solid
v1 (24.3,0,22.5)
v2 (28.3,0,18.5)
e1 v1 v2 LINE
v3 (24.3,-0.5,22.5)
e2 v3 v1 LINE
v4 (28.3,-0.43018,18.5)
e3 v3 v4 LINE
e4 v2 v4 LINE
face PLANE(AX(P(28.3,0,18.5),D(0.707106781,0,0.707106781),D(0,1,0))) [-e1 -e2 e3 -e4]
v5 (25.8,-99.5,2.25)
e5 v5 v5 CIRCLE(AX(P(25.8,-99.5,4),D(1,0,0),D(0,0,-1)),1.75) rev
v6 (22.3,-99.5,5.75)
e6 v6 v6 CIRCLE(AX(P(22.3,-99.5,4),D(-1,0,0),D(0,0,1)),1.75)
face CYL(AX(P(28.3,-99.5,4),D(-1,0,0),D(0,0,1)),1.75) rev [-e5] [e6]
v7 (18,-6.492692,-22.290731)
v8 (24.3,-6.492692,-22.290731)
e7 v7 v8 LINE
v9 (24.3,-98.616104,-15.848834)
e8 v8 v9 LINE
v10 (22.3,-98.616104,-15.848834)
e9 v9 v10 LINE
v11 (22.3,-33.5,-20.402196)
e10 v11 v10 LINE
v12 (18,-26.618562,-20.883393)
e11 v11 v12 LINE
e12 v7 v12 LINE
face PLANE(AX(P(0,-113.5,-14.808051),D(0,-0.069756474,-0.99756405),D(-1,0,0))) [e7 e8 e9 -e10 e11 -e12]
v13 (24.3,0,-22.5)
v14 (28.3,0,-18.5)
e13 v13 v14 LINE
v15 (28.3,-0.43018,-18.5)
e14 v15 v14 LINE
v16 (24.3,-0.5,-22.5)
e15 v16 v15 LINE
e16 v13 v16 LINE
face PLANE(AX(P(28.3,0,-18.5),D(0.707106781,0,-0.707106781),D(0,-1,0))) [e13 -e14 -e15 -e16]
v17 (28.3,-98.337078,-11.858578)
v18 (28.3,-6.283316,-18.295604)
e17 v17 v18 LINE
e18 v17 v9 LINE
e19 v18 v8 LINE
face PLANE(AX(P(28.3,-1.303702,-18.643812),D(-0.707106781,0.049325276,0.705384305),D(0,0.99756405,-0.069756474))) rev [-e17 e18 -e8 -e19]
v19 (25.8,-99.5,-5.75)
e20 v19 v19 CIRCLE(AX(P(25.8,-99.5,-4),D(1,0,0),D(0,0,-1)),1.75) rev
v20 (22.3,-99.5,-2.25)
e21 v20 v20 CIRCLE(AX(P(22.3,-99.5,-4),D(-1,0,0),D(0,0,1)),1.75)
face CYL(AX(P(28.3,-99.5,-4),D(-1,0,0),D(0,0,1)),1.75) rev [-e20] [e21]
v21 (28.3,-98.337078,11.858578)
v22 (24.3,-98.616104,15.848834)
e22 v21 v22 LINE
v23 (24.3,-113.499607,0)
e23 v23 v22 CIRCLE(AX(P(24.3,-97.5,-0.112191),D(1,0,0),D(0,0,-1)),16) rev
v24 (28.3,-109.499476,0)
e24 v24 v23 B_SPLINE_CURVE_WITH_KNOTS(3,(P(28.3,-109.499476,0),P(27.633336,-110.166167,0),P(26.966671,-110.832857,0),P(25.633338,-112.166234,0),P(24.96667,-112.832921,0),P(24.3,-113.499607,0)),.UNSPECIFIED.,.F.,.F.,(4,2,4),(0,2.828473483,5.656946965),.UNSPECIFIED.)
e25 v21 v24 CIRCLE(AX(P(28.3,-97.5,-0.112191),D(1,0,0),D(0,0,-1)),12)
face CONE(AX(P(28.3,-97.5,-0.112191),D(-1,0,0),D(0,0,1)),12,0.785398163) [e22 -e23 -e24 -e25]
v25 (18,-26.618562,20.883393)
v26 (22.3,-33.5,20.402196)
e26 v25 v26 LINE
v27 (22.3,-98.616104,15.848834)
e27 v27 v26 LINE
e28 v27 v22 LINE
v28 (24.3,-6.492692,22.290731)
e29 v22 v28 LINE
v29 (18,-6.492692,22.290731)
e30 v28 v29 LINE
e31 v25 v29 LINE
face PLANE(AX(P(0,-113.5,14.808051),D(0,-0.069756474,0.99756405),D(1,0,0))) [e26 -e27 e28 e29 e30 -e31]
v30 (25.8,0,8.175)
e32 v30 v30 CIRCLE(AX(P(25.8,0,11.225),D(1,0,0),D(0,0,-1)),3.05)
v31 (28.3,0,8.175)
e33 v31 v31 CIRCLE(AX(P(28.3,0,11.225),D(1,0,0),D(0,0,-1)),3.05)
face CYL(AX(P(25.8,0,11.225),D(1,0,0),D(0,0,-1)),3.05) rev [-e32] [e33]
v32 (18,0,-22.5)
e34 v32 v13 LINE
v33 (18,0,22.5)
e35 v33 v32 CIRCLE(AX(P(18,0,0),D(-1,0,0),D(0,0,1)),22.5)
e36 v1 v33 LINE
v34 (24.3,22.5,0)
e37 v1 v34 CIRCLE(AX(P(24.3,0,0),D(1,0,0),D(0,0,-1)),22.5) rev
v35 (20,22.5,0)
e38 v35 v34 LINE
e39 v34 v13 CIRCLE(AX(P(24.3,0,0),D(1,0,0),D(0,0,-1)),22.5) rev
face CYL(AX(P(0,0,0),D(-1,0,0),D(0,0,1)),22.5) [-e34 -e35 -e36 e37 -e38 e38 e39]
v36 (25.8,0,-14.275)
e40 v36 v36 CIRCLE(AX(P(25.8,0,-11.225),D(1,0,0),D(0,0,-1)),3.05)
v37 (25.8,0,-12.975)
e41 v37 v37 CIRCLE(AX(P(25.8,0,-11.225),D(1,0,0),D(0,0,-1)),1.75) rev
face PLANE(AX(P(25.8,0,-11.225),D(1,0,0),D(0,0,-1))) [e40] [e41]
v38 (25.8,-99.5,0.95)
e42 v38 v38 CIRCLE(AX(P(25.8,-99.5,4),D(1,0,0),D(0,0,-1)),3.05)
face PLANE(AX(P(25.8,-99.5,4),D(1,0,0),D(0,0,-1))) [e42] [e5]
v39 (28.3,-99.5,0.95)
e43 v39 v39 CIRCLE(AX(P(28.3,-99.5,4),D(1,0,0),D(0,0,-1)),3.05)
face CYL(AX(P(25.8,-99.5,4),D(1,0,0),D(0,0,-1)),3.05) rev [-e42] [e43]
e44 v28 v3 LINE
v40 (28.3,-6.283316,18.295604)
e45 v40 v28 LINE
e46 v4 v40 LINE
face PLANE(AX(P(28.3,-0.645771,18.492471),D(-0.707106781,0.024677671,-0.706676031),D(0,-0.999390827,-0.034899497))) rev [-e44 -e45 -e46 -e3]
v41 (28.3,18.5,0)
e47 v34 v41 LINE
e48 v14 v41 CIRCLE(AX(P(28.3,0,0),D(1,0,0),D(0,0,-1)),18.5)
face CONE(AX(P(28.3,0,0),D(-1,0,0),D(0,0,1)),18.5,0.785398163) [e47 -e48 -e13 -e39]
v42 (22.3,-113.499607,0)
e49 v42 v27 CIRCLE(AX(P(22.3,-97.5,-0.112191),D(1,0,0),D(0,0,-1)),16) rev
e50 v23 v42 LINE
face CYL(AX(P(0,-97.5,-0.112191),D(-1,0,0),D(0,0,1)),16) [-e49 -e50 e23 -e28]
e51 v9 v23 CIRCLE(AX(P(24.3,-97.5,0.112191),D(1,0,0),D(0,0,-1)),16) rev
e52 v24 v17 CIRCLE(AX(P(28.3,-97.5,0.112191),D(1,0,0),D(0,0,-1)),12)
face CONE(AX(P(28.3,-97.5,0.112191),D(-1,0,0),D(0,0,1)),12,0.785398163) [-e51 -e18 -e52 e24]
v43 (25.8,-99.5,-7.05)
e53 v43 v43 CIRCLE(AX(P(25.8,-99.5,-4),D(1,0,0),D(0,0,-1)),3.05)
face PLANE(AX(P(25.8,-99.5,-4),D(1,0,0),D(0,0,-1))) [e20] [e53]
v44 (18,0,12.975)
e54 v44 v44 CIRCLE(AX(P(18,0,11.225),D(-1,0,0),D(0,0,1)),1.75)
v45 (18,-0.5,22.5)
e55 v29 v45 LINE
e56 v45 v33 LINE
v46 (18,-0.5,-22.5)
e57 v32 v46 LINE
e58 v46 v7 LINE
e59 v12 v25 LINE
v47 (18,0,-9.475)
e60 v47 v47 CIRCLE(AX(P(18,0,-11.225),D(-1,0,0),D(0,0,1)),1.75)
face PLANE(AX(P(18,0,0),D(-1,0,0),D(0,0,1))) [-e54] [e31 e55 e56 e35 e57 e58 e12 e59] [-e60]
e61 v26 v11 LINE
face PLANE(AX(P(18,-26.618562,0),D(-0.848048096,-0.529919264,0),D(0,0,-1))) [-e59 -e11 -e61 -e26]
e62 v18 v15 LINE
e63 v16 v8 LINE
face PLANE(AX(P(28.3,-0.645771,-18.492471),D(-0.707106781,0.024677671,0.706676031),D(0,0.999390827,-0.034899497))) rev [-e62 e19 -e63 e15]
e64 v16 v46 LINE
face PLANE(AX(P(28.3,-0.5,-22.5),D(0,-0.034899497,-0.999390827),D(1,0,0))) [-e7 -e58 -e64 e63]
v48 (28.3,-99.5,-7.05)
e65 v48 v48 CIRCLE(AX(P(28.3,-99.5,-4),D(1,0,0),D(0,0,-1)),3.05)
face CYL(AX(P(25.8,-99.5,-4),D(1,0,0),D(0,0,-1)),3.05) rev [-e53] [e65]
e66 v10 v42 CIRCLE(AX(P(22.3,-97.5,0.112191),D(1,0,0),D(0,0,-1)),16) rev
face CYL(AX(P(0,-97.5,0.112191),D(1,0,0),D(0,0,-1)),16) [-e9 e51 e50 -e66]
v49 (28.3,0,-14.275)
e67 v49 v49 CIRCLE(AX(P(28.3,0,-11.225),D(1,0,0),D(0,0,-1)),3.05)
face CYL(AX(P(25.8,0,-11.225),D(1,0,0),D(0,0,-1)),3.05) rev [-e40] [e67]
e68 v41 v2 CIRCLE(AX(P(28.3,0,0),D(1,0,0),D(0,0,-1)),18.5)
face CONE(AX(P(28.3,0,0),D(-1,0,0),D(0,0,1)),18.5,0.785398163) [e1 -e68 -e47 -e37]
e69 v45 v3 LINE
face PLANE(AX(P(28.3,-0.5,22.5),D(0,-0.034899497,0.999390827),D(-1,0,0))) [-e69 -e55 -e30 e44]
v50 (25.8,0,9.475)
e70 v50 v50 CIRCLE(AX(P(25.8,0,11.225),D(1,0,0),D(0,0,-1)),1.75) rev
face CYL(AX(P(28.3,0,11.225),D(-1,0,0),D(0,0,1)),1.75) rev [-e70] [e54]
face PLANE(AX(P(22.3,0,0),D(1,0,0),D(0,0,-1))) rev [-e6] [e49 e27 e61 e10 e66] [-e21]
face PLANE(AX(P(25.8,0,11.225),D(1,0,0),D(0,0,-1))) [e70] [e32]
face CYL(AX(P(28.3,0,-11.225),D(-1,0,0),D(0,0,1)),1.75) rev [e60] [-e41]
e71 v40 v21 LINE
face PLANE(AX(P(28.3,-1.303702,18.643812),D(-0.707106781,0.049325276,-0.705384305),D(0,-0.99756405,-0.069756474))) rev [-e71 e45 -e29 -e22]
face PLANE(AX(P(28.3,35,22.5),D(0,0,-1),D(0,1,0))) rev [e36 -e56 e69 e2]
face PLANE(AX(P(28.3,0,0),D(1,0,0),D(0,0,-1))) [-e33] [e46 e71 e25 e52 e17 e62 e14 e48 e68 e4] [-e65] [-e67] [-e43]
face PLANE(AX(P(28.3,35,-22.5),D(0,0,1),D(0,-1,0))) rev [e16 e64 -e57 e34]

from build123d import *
from OCP.BRepFilletAPI import BRepFilletAPI_MakeChamfer

# Parameters (mm, degrees)
SKETCH1_W           = 20
SKETCH1_H           = 20
BOSS_EXTRUDE1_DEPTH = 20
SKETCH2_W           = 45
SKETCH2_H           = 70
BOSS_EXTRUDE2_DEPTH = 8.3
CUT_EXTRUDE1_DEPTH  = 5.8
FILLET1_R           = 3.6
FILLET2_R           = 10
SKETCH5_R           = 3.9
CUT_EXTRUDE2_DEPTH  = 51.320373608
CUT_EXTRUDE3_REACH  = 49.302
SKETCH6_R           = 1.75
SKETCH13_W          = 20
SKETCH13_H          = 20
CUT_EXTRUDE9_DEPTH  = 20
SKETCH15_W          = 8.3
SKETCH15_H          = 45
CUT_EXTRUDE10_DEPTH = 12.5
SKETCH18_W          = 8.3
SKETCH18_H          = 45
BOSS_EXTRUDE4_DEPTH = 78.5
FILLET5_R           = 22.5
SKETCH20_W          = 45
SKETCH20_H          = 80
CUT_EXTRUDE12_DEPTH = 2.3
CHAMFER2_SIZE       = 110
CHAMFER2_SIZE2      = 7.691949314
CHAMFER3_SIZE       = 3
FILLET6_R           = 16
CHAMFER4_SIZE       = 4
SKETCH21_R          = 1.75
CUT_EXTRUDE15_DEPTH = 116.863759268
SKETCH14_R          = 1.75
CUT_EXTRUDE16_DEPTH = 117.005606381
SKETCH23_W          = 17
SKETCH23_H          = 38.9
BOSS_EXTRUDE5_DEPTH = 8.3
BOSS_EXTRUDE6_START = 2
SKETCH24_R          = 1.75
BOSS_EXTRUDE6_DEPTH = 2
CHAMFER5_SIZE2      = 4.3
CHAMFER5_SIZE       = 6.881438475
SKETCH25_R          = 3.05
CUT_EXTRUDE17_DEPTH = 2.5


# Some blends are built 0.0001 mm under size
with BuildPart() as part:
    # Sketch1 → Boss-Extrude1 (new body)
    with BuildSketch(Plane(origin=(0, 0, 0), x_dir=(0, 0, -1), z_dir=(1, 0, 0))):
        Rectangle(SKETCH1_W, SKETCH1_H)
    extrude(amount=BOSS_EXTRUDE1_DEPTH)

    # Sketch2 → Boss-Extrude2 (add)
    with BuildSketch(Plane(origin=(20, 0, 0), x_dir=(0, 0, -1), z_dir=(1, 0, 0))):
        Rectangle(SKETCH2_W, SKETCH2_H)
    extrude(amount=BOSS_EXTRUDE2_DEPTH)

    # Sketch4 → Cut-Extrude1 (cut)
    with BuildSketch(Plane(origin=(28.3, 0, 0), x_dir=(0, 0, -1), z_dir=(1, 0, 0))):
        with BuildLine():
            Line((3.6, -28.55), (-3.6, -28.55))
            Line((-3.6, -28.55), (-3.6, -7.311805523))
            ThreePointArc((-3.6, -7.311805523), (0, 8.15), (3.6, -7.311805523))
            Line((3.6, -7.311805523), (3.6, -28.55))
        make_face()
    extrude(amount=-CUT_EXTRUDE1_DEPTH, mode=Mode.SUBTRACT)

    # Fillet1
    fillet1_edges = [part.edges().sort_by_distance(p)[0] for p in [
        (25.4, -28.55, 3.6),
        (25.4, -28.55, -3.6),
    ]]
    fillet(fillet1_edges, radius=FILLET1_R - 0.0001)  # a hair under: the kernel refuses the full size

    # Fillet2
    fillet2_edges = [part.edges().sort_by_distance(p)[0] for p in [
        (25.4, -7.311805523, 3.6),
        (25.4, -7.311805523, -3.6),
    ]]
    fillet(fillet2_edges, radius=FILLET2_R)

    # Sketch5 → Cut-Extrude2 (cut, through all)
    with BuildSketch(Plane.ZY):
        Circle(SKETCH5_R)
    extrude(amount=-CUT_EXTRUDE2_DEPTH, mode=Mode.SUBTRACT)

    # Sketch6 → Cut-Extrude3 (cut, up to next)
    with BuildSketch(Plane(origin=(22.5, 0, 0), x_dir=(0, 0, -1), z_dir=(1, 0, 0)), mode=Mode.PRIVATE) as cut_extrude3_sk1:
        with Locations((0, -20.6)):
            Circle(SKETCH6_R)
    cut_extrude3_tool1 = extrude(cut_extrude3_sk1.sketch, amount=-CUT_EXTRUDE3_REACH, mode=Mode.PRIVATE) & part.part
    # Sketch6 → Cut-Extrude3 (cut, up to next)
    with BuildSketch(Plane(origin=(22.5, 0, 0), x_dir=(0, 0, -1), z_dir=(1, 0, 0)), mode=Mode.PRIVATE) as cut_extrude3_sk2:
        with Locations((0, -9.35)):
            Circle(SKETCH6_R)
    cut_extrude3_tool2 = extrude(cut_extrude3_sk2.sketch, amount=-CUT_EXTRUDE3_REACH, mode=Mode.PRIVATE) & part.part
    add(cut_extrude3_tool1.solids().sort_by_distance((22.5, -20.6, 0))[0], mode=Mode.SUBTRACT)
    add(cut_extrude3_tool2.solids().sort_by_distance((22.5, -9.35, 0))[0], mode=Mode.SUBTRACT)

    # Sketch13 → Cut-Extrude9 (cut)
    with BuildSketch(Plane.ZY):
        Rectangle(SKETCH13_W, SKETCH13_H)
    extrude(amount=-CUT_EXTRUDE9_DEPTH, mode=Mode.SUBTRACT)

    # Sketch15 → Cut-Extrude10 (cut)
    with BuildSketch(Plane(origin=(0, 35, 0), x_dir=(1, 0, 0), z_dir=(0, 1, 0))):
        with Locations((24.15, 0)):
            Rectangle(SKETCH15_W, SKETCH15_H)
    extrude(amount=-CUT_EXTRUDE10_DEPTH, mode=Mode.SUBTRACT)

    # Sketch18 → Boss-Extrude4 (add)
    with BuildSketch(Plane.XZ.offset(35)):
        with Locations((24.15, 0)):
            Rectangle(SKETCH18_W, SKETCH18_H)
    extrude(amount=BOSS_EXTRUDE4_DEPTH)

    # Fillet5
    fillet5_edges = [part.edges().sort_by_distance(p)[0] for p in [
        (24.15, 22.5, -22.5),
        (24.15, 22.5, 22.5),
    ]]
    fillet(fillet5_edges, radius=FILLET5_R - 0.0001)  # a hair under: the kernel refuses the full size

    # Sketch20 → Cut-Extrude12 (cut)
    with BuildSketch(Plane.ZY.offset(-20)):
        with Locations((0, -73.5)):
            Rectangle(SKETCH20_W, SKETCH20_H)
    extrude(amount=-CUT_EXTRUDE12_DEPTH, mode=Mode.SUBTRACT)

    # Chamfer2: one chamfer whose edges measure the first distance from different faces: ONE call of the kernel's chamfer builder (chamfer() names one face for all edges)
    chamfer2_edges_1 = [part.edges().sort_by_distance(p)[0] for p in [
        (25.3, -113.5, -22.5),
    ]]
    chamfer2_side_1 = [part.faces().sort_by_distance(p)[0] for p in [
        (24.878183359, -52.68424744, -22.5),
    ]]
    chamfer2_edges_2 = [part.edges().sort_by_distance(p)[0] for p in [
        (25.3, -113.5, 22.5),
    ]]
    chamfer2_side_2 = [part.faces().sort_by_distance(p)[0] for p in [
        (24.878183359, -52.68424744, 22.5),
    ]]
    chamfer2 = BRepFilletAPI_MakeChamfer(part.part.solid().wrapped)
    for e in chamfer2_edges_1:
        chamfer2.Add(CHAMFER2_SIZE, CHAMFER2_SIZE2, e.wrapped, chamfer2_side_1[0].wrapped)  # the first distance lies on this face
    for e in chamfer2_edges_2:
        chamfer2.Add(CHAMFER2_SIZE, CHAMFER2_SIZE2, e.wrapped, chamfer2_side_2[0].wrapped)  # the first distance lies on this face
    add(Compound.cast(chamfer2.Shape()), mode=Mode.REPLACE)

    # Chamfer3
    # the kernel refuses this chamfer: 3 mm, written as the material it takes off along each edge
    with BuildSketch(Plane(origin=(36.099824275, -3.5, -22.5), x_dir=(0, -0.9976567869548854, 0.06841736214481542), z_dir=(-1, 0, 0))) as chamfer3_piece_1:
        Polygon((CHAMFER3_SIZE * 0.99999909909, CHAMFER3_SIZE * 0.00134231857559), (-CHAMFER3_SIZE * 0.997656786955, CHAMFER3_SIZE * 0.0684173621448), (0, 0), align=None)
    extrude(amount=23.89964855, mode=Mode.SUBTRACT)
    with BuildSketch(Plane(origin=(12.200175725, -3.5, 22.5), x_dir=(0, 0.999999099090015, 0.0013423185755924486), z_dir=(1, 0, 0))) as chamfer3_piece_2:
        Polygon((CHAMFER3_SIZE * 0.99999909909, -CHAMFER3_SIZE * 0.00134231857559), (-CHAMFER3_SIZE * 0.997656786955, -CHAMFER3_SIZE * 0.0684173621448), (0, 0), align=None)
    extrude(amount=23.89964855, mode=Mode.SUBTRACT)

    # Fillet6
    # the kernel refuses this fillet: 16 mm, written as the material it takes off along each edge
    with BuildSketch(Plane(origin=(65.600603446, -113.5, -14.808050686), x_dir=(0, 0, 1), z_dir=(-1, 0, 0))) as fillet6_piece_1:
        with BuildLine():
            CenterArc((FILLET6_R * 0.932515086138, FILLET6_R), FILLET6_R, 184, 86)
            Line((-FILLET6_R * 0.0650489641222, FILLET6_R * 0.930243526256), (0, 0))
            Line((0, 0), (FILLET6_R * 0.932515086138, 0))
        make_face()
    extrude(amount=80.601206891, mode=Mode.SUBTRACT)
    with BuildSketch(Plane(origin=(-15.000603446, -113.5, 14.808050686), x_dir=(0, 0.9975640502598242, 0.06975647374412544), z_dir=(1, 0, 0))) as fillet6_piece_2:
        with BuildLine():
            CenterArc((FILLET6_R * 0.932515086138, -FILLET6_R), FILLET6_R, 90, 86)
            Line((-FILLET6_R * 0.0650489641222, -FILLET6_R * 0.930243526256), (0, 0))
            Line((0, 0), (FILLET6_R * 0.932515086138, 0))
        make_face()
    extrude(amount=80.601206891, mode=Mode.SUBTRACT)

    # Chamfer4
    # the kernel refuses this chamfer: 4 mm, written as the material it takes off along each edge
    with BuildSketch(Plane(origin=(28.3, 0.0001, 22.5), x_dir=(0.02749587661058735, 0, -0.9996219169112968), z_dir=(0, -1, 0)), Plane(origin=(28.3, -10.786731952, -22.5), x_dir=(0.027495876610586487, 0, 0.9996219169112968), z_dir=(0, 1, 0))) as chamfer4_piece_1:
        Polygon((CHAMFER4_SIZE * 0.999621916911, -CHAMFER4_SIZE * 0.0274958766106), (-CHAMFER4_SIZE * 0.0274958766106, -CHAMFER4_SIZE * 0.999621916911), (0, 0), align=None)
    extrude(amount=10.786831952, mode=Mode.SUBTRACT)
    with BuildSketch(Plane(origin=(28.3, 0.0001, 0.0001), x_dir=(0, 1, 0), z_dir=(0, 0, -1))) as chamfer4_piece_2:
        Polygon((22.4999 - CHAMFER4_SIZE, 0), (22.4999, -CHAMFER4_SIZE), (22.4999, 0), align=None)
    revolve(axis=Axis((28.3, 0.0001, 0.0001), (1, 0, 0)), revolution_arc=90, mode=Mode.SUBTRACT)
    with BuildSketch(Plane(origin=(28.3, 0.0001, -0.0001), x_dir=(0, 0, -1), z_dir=(0, -1, 0))) as chamfer4_piece_3:
        Polygon((22.4999 - CHAMFER4_SIZE, 0), (22.4999, -CHAMFER4_SIZE), (22.4999, 0), align=None)
    revolve(axis=Axis((28.3, 0.0001, -0.0001), (1, 0, 0)), revolution_arc=90, mode=Mode.SUBTRACT)
    with BuildSketch(Plane(origin=(28.3, 3.768981839, 23.008296726), x_dir=(0.027495876610586473, 0.06973010000107531, -0.9971868881625227), z_dir=(0, -0.9975640502598243, -0.06975647374412554))) as chamfer4_piece_4:
        Polygon((CHAMFER4_SIZE * 0.999621916911, -CHAMFER4_SIZE * 0.0274958766106), (-CHAMFER4_SIZE * 0.0274958766106, -CHAMFER4_SIZE * 0.999621916911), (0, 0), align=None)
    extrude(amount=102.635099363, mode=Mode.SUBTRACT)
    with BuildSketch(Plane(origin=(28.3, 9.780465553, -22.859001768), x_dir=(0.027495876610586487, 0.03488630179317817, 0.9990129742483882), z_dir=(0, -0.9993908270190893, 0.03489949670268572))) as chamfer4_piece_5:
        Polygon((CHAMFER4_SIZE * 0.999621916911, CHAMFER4_SIZE * 0.0274958766106), (-CHAMFER4_SIZE * 0.0274958766106, CHAMFER4_SIZE * 0.999621916911), (0, 0), align=None)
    extrude(amount=26.569808866, mode=Mode.SUBTRACT)
    with BuildSketch(Plane(origin=(28.3, 9.780465553, 22.859001768), x_dir=(0.027495876610586494, 0.034886301793392936, -0.9990129742483806), z_dir=(0, -0.9993908270190818, -0.03489949670290056))) as chamfer4_piece_6:
        Polygon((CHAMFER4_SIZE * 0.999621916911, -CHAMFER4_SIZE * 0.0274958766106), (-CHAMFER4_SIZE * 0.0274958766106, -CHAMFER4_SIZE * 0.999621916911), (0, 0), align=None)
    extrude(amount=26.569808866, mode=Mode.SUBTRACT)
    with BuildSketch(Plane(origin=(28.3, 3.768981839, -23.008296726), x_dir=(0.027495876610586473, 0.06973010000107512, 0.9971868881625227), z_dir=(0, -0.9975640502598243, 0.06975647374412534))) as chamfer4_piece_7:
        Polygon((CHAMFER4_SIZE * 0.999621916911, CHAMFER4_SIZE * 0.0274958766106), (-CHAMFER4_SIZE * 0.0274958766106, CHAMFER4_SIZE * 0.999621916911), (0, 0), align=None)
    extrude(amount=102.635099363, mode=Mode.SUBTRACT)
    with BuildSketch(Plane(origin=(28.3, -97.5, -0.112190692), x_dir=(0, -0.9999754161991546, 0.007011918234514749), z_dir=(0, -0.007011918234514749, -0.9999754161991546))) as chamfer4_piece_8:
        Polygon((16 - CHAMFER4_SIZE, 0), (16, CHAMFER4_SIZE), (16, 0), align=None)
    revolve(axis=Axis((28.3, -97.5, -0.112190692), (-1, 0, 0)), revolution_arc=85.598243387, mode=Mode.SUBTRACT)
    with BuildSketch(Plane(origin=(28.3, -97.5, 0.112190692), x_dir=(0, -0.9999754161989443, -0.0070119182645099615), z_dir=(0, -0.0070119182645099615, 0.9999754161989443))) as chamfer4_piece_9:
        Polygon((16 - CHAMFER4_SIZE, 0), (16, -CHAMFER4_SIZE), (16, 0), align=None)
    revolve(axis=Axis((28.3, -97.5, 0.112190692), (1, 0, 0)), revolution_arc=85.598243385, mode=Mode.SUBTRACT)
    with BuildSketch(Plane(origin=(28.3, 22.5, -0.0001), x_dir=(0.027495876610588214, -0.9996219169112968, 0), z_dir=(0, 0, 1))) as chamfer4_piece_10:
        Polygon((CHAMFER4_SIZE * 0.999621916911, -CHAMFER4_SIZE * 0.0274958766106), (-CHAMFER4_SIZE * 0.0274958766106, -CHAMFER4_SIZE * 0.999621916911), (0, 0), align=None)
    extrude(amount=0.0002, mode=Mode.SUBTRACT)

    # Sketch21 → Cut-Extrude15 (cut, through all)
    with BuildSketch(Plane.ZY.offset(-22.3)):
        with Locations((-4, -99.5)):
            Circle(SKETCH21_R)
        with Locations((4, -99.5)):
            Circle(SKETCH21_R)
    extrude(amount=-CUT_EXTRUDE15_DEPTH, mode=Mode.SUBTRACT)

    # Sketch14 → Cut-Extrude16 (cut, through all)
    with BuildSketch(Plane.ZY.offset(-20)):
        with Locations((-11.225, 0)):
            Circle(SKETCH14_R)
        with Locations((11.225, 0)):
            Circle(SKETCH14_R)
    extrude(amount=-CUT_EXTRUDE16_DEPTH, mode=Mode.SUBTRACT)

    # Sketch23 → Boss-Extrude5 (add, through all)
    with BuildSketch(Plane(origin=(28.3, 0, 0), x_dir=(0, 0, -1), z_dir=(1, 0, 0))):
        with Locations((0, -10.55)):
            Rectangle(SKETCH23_W, SKETCH23_H)
    extrude(amount=-BOSS_EXTRUDE5_DEPTH)

    # Sketch24 → Boss-Extrude6 (add)
    with BuildSketch(Plane.ZY.offset(-20).offset(BOSS_EXTRUDE6_START)):
        with BuildLine():
            Line((20.402195642, -33.5), (22.290730579, -6.492692151))
            Line((22.290730579, -6.492692151), (22.5, -0.5))
            Line((22.5, -0.5), (22.5, 0))
            ThreePointArc((22.5, 0), (15.909902577, 15.909902577), (0, 22.5))
            ThreePointArc((0, 22.5), (-15.909902577, 15.909902577), (-22.5, 0))
            Line((-22.5, 0), (-22.5, -0.5))
            Line((-22.5, -0.5), (-22.290730579, -6.492692151))
            Line((-22.290730579, -6.492692151), (-20.402195642, -33.5))
            Line((-20.402195642, -33.5), (20.402195642, -33.5))
        make_face()
        with Locations((11.225, 0)):
            Circle(SKETCH24_R, mode=Mode.SUBTRACT)
        with Locations((-11.225, 0)):
            Circle(SKETCH24_R, mode=Mode.SUBTRACT)
    extrude(amount=-BOSS_EXTRUDE6_DEPTH)

    # Chamfer5
    chamfer5_edges = [part.edges().sort_by_distance(p)[0] for p in [
        (18, -33.5, 0),
    ]]
    chamfer5_side = [part.faces().sort_by_distance(p)[0] for p in [
        (18, -33.414, 0),
    ]]
    chamfer(chamfer5_edges, length=CHAMFER5_SIZE - 0.0001, length2=CHAMFER5_SIZE2 - 0.0001, reference=chamfer5_side[0])  # a hair under: the kernel refuses the full size

    # Sketch25 → Cut-Extrude17 (cut)
    with BuildSketch(Plane(origin=(28.3, 0, 0), x_dir=(0, 0, -1), z_dir=(1, 0, 0))):
        with Locations((-11.225, 0)):
            Circle(SKETCH25_R)
        with Locations((11.225, 0)):
            Circle(SKETCH25_R)
        with Locations((-4, -99.5)):
            Circle(SKETCH25_R)
        with Locations((4, -99.5)):
            Circle(SKETCH25_R)
    extrude(amount=-CUT_EXTRUDE17_DEPTH, mode=Mode.SUBTRACT)


solid = part.part
